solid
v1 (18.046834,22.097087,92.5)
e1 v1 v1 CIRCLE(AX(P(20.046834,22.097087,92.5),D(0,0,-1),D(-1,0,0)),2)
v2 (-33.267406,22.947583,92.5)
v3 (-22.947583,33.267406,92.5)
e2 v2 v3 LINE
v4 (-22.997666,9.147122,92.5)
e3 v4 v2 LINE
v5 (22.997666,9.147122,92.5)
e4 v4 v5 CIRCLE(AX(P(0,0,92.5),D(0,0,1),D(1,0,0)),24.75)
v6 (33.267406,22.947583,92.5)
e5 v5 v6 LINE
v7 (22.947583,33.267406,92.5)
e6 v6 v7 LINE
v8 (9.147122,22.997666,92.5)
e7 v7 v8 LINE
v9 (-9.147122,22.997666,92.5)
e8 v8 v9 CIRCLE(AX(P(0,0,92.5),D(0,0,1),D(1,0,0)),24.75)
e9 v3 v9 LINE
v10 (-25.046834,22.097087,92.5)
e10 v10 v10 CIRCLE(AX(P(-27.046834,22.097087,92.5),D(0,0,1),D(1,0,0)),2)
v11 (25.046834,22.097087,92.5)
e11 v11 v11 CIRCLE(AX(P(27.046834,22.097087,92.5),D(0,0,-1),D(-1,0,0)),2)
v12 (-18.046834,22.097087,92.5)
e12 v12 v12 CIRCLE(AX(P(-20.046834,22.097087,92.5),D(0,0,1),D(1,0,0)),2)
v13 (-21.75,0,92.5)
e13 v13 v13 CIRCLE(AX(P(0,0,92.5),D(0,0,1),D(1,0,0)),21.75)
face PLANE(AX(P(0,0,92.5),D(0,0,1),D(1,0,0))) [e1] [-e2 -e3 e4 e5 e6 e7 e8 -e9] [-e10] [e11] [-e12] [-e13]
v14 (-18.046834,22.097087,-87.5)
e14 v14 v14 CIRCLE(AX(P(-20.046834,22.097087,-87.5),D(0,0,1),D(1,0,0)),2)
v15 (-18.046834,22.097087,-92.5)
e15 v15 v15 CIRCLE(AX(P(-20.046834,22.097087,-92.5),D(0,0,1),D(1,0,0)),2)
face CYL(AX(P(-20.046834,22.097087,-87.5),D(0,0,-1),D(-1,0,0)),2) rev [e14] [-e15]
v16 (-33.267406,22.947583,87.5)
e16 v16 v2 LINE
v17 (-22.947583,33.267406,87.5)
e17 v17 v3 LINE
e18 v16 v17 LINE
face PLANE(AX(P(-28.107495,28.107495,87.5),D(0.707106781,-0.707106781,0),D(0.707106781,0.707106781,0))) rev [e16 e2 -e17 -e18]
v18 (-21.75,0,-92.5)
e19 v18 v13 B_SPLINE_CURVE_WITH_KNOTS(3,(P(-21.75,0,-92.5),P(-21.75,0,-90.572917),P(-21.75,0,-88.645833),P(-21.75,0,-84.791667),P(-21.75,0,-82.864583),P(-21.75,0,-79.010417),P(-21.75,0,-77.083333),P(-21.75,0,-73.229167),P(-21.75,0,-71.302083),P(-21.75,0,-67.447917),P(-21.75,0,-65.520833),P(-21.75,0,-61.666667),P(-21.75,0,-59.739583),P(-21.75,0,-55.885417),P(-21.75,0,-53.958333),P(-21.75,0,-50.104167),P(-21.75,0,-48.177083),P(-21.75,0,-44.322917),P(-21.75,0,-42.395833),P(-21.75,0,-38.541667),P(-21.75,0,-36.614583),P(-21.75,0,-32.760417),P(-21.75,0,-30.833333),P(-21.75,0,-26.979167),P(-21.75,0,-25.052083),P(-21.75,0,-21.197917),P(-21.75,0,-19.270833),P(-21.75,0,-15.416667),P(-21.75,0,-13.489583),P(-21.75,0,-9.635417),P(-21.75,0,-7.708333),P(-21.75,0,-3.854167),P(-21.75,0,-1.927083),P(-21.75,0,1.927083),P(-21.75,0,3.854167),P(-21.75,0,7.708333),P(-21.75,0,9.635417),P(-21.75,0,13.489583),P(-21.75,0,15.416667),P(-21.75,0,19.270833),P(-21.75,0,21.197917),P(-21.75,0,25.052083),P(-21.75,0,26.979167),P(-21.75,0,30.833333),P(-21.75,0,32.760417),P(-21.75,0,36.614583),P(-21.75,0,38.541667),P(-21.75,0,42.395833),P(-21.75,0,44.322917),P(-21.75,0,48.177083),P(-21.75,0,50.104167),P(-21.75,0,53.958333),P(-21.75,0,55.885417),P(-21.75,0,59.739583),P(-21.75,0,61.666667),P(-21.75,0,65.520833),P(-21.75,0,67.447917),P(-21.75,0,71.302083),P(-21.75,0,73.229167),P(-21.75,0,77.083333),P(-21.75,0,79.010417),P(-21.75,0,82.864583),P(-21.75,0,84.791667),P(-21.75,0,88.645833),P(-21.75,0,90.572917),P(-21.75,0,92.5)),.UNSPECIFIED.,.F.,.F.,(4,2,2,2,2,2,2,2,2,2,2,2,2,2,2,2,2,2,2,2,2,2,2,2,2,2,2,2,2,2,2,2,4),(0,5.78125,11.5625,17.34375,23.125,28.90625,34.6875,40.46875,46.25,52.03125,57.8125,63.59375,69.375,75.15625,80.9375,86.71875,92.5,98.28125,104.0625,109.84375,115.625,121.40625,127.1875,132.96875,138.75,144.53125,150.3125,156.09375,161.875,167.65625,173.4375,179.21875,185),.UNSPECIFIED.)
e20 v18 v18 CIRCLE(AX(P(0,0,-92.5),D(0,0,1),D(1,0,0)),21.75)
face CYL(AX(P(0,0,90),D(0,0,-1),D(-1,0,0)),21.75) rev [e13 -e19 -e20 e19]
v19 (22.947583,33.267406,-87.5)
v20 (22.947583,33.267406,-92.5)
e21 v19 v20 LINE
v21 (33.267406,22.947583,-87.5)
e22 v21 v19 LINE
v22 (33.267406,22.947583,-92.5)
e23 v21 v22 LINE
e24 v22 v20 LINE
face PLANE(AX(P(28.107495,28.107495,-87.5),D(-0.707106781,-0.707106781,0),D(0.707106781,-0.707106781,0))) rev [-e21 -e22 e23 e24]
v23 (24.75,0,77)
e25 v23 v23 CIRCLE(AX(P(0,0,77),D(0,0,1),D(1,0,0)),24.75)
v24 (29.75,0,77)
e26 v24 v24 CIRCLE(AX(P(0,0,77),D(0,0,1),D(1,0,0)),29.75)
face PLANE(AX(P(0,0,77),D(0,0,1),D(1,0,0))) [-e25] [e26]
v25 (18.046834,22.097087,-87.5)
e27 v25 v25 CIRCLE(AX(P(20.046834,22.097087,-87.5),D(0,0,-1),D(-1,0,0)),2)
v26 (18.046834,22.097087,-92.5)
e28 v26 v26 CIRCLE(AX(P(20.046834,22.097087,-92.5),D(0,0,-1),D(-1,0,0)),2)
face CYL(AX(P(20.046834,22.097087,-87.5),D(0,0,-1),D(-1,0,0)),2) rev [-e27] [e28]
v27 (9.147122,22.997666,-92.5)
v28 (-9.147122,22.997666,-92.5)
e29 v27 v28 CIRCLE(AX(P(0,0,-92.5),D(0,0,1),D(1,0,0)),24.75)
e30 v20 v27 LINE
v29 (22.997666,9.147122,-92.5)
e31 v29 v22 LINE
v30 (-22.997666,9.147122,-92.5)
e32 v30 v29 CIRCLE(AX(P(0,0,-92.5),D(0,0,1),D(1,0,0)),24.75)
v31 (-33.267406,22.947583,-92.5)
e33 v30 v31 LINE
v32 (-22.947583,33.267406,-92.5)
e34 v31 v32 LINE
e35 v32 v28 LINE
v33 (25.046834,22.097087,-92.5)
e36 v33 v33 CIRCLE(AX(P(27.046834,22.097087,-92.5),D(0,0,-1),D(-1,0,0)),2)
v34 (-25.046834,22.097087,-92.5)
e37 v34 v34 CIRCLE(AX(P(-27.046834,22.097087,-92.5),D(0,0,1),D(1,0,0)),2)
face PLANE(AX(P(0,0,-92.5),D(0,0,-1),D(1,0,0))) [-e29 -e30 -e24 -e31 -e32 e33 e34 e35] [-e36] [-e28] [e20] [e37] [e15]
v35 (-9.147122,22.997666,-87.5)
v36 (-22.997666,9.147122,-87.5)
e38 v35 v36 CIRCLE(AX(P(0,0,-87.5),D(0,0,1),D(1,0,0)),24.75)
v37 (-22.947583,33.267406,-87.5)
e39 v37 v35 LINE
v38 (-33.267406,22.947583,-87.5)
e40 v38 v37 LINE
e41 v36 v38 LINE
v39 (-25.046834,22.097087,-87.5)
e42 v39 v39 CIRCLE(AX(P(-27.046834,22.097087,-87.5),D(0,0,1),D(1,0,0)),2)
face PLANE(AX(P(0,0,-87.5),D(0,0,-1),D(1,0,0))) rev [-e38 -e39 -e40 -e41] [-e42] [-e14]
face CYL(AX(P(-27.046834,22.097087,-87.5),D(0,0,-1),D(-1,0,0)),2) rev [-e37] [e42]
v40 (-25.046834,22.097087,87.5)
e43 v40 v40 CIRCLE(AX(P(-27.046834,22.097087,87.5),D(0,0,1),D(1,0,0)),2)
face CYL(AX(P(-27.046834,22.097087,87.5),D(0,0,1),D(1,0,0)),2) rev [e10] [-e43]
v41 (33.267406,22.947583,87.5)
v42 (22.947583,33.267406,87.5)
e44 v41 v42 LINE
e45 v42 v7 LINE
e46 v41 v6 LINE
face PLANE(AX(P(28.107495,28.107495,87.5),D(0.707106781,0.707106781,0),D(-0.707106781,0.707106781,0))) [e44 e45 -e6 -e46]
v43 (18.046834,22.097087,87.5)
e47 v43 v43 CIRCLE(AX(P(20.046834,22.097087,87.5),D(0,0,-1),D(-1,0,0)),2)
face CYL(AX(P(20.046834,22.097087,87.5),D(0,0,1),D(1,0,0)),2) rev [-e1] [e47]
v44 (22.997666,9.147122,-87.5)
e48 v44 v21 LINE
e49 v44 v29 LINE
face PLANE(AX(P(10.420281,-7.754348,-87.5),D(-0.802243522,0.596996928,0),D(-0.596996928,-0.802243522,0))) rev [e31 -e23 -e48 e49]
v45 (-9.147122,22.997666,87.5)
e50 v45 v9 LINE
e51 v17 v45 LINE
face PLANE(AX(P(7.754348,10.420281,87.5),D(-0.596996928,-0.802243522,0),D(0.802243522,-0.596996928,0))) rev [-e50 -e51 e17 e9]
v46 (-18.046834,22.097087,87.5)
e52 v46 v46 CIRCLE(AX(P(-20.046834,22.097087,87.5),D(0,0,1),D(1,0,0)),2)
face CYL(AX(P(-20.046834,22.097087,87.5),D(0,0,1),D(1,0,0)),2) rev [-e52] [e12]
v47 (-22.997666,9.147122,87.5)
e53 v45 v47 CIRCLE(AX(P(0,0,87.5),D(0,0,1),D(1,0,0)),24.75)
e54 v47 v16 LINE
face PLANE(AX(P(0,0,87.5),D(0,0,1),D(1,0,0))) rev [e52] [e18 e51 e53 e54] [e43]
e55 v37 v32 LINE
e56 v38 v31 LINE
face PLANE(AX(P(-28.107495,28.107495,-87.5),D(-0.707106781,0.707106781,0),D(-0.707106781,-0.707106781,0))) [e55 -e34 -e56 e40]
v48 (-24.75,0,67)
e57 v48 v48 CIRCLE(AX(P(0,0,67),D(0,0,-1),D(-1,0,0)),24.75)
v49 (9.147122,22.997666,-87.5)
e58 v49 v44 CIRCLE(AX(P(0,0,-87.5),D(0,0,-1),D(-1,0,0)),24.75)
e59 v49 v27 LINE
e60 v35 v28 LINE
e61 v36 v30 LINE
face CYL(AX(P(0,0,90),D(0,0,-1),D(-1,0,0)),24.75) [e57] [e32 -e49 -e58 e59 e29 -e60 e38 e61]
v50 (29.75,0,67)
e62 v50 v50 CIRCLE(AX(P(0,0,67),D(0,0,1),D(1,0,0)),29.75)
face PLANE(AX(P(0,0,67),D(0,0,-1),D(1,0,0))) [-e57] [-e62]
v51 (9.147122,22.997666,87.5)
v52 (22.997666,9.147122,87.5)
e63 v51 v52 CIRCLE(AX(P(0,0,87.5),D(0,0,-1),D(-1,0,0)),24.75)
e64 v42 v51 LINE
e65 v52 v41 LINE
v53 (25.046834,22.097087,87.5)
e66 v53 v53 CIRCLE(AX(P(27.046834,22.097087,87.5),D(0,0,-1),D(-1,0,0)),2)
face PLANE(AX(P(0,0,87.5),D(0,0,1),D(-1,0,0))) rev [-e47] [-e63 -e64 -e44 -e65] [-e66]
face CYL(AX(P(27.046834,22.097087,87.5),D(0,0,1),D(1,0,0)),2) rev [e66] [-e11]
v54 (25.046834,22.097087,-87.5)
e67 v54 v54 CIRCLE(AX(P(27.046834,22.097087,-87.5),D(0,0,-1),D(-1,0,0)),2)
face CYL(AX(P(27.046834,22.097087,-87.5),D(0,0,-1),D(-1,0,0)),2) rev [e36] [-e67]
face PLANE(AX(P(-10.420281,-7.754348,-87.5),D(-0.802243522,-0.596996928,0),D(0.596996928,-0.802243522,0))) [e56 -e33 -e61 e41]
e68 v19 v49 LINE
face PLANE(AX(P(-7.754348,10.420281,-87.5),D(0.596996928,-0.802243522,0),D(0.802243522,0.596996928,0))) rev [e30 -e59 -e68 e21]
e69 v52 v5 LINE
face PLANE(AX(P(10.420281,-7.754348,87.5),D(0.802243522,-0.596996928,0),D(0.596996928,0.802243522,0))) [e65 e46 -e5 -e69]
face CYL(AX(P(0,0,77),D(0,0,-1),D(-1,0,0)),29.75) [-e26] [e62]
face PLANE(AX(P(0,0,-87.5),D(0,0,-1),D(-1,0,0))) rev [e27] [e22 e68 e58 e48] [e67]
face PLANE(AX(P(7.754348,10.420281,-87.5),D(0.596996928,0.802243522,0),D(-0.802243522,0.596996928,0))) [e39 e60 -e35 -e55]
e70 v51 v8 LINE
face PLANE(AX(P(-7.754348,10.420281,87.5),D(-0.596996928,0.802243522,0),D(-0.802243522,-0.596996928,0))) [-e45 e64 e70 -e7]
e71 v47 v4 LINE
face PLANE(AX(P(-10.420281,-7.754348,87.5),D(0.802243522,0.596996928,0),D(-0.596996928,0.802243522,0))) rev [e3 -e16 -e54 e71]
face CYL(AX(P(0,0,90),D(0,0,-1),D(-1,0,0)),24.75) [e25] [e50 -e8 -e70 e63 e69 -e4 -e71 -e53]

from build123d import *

# Parameters (mm, degrees)
SKETCH1_R             = 24.75
SKETCH1_R_2           = 21.75
BOSS_EXTRUDE1_DEPTH   = 90
BOSS_EXTRUDE3_START   = 72
SKETCH5_R             = 29.75
SKETCH5_R_2           = 21.75
BOSS_EXTRUDE3_DEPTH   = 5
SKETCH7_R             = 24.75
SKETCH7_R_2           = 21.75
BOSS_EXTRUDE4_DEPTH   = 2.5
BOSS_EXTRUDE5_START   = -5
SKETCH6_R             = 2
BOSS_EXTRUDE5_DEPTH   = 5
MIRROR2_START         = -92.5
MIRROR2_OUTLINE_R     = 24.75
MIRROR2_OUTLINE_R_2   = 21.75
MIRROR2_DEPTH         = 92.5
MIRROR2_START_2       = 67
MIRROR2_2_OUTLINE_R   = 29.75
MIRROR2_2_OUTLINE_R_2 = 24.75
MIRROR2_2_DEPTH       = 5
MIRROR2_3_OUTLINE_R   = 2
MIRROR2_3_DEPTH       = 5


# Read off the part's stored shape, not the designer's step: Mirror2
with BuildPart() as part:
    # Sketch1 → Boss-Extrude1 (new body)
    with BuildSketch(Plane.XY):
        with Locations(Location((0, 0, 0), (0, 0, 180))):
            Circle(SKETCH1_R)
        with Locations(Location((0, 0, 0), (0, 0, 180))):
            Circle(SKETCH1_R_2, mode=Mode.SUBTRACT)
    extrude(amount=BOSS_EXTRUDE1_DEPTH)

    # Sketch5 → Boss-Extrude3 (add)
    with BuildSketch(Plane.XY.offset(BOSS_EXTRUDE3_START)):
        Circle(SKETCH5_R)
        with Locations(Location((0, 0, 0), (0, 0, 180))):
            Circle(SKETCH5_R_2, mode=Mode.SUBTRACT)
    extrude(amount=BOSS_EXTRUDE3_DEPTH)

    # Sketch7 → Boss-Extrude4 (add, symmetric)
    with BuildSketch(Plane.XY.offset(90)):
        with Locations(Location((0, 0, 0), (0, 0, 180))):
            Circle(SKETCH7_R)
        with Locations(Location((0, 0, 0), (0, 0, 180))):
            Circle(SKETCH7_R_2, mode=Mode.SUBTRACT)
    extrude(amount=BOSS_EXTRUDE4_DEPTH, both=True)

    # Sketch6 → Boss-Extrude5 (add)
    with BuildSketch(Plane.XY.offset(92.5).offset(BOSS_EXTRUDE5_START)):
        with BuildLine():
            Line((-22.997666259, 9.147122314), (-33.267406372, 22.947582732))
            Line((-33.267406372, 22.947582732), (-22.947582732, 33.267406372))
            Line((-22.947582732, 33.267406372), (-9.147122314, 22.997666259))
            ThreePointArc((-9.147122314, 22.997666259), (-17.500892834, 17.500892834), (-22.997666259, 9.147122314))
        make_face()
        with Locations((-20.04683438, 22.097086912)):
            Circle(SKETCH6_R, mode=Mode.SUBTRACT)
        with Locations((-27.04683438, 22.097086912)):
            Circle(SKETCH6_R, mode=Mode.SUBTRACT)
    boss_extrude5 = extrude(amount=BOSS_EXTRUDE5_DEPTH)

    # Mirror1: Boss-Extrude5 across plane
    add(boss_extrude5.mirror(Plane(origin=(0, 0, 0), x_dir=(0, 0, 1), z_dir=(1, 0, 0))))

    # Mirror2 outline → Mirror2 (add)
    with BuildSketch(Plane.XY.offset(MIRROR2_START)):
        Circle(MIRROR2_OUTLINE_R)
        Circle(MIRROR2_OUTLINE_R_2, mode=Mode.SUBTRACT)
    extrude(amount=MIRROR2_DEPTH)

    # Mirror2 2 outline → Mirror2 2 (add)
    with BuildSketch(Plane.XY.offset(MIRROR2_START_2)):
        Circle(MIRROR2_2_OUTLINE_R)
        Circle(MIRROR2_2_OUTLINE_R_2, mode=Mode.SUBTRACT)
    extrude(amount=MIRROR2_2_DEPTH)

    # Mirror2 3 outline → Mirror2 3 (add)
    # profile 1 of 2: a face of its own
    with BuildSketch(Plane.XY.offset(MIRROR2_START)):
        with BuildLine():
            ThreePointArc((9.147122314, 22.997666259), (17.500892834, 17.500892834), (22.997666259, 9.147122314))
            Line((22.997666259, 9.147122314), (33.267406372, 22.947582732))
            Line((33.267406372, 22.947582732), (22.947582732, 33.267406372))
            Line((22.947582732, 33.267406372), (9.147122314, 22.997666259))
        make_face()
        with Locations((20.04683438, 22.097086912)):
            Circle(MIRROR2_3_OUTLINE_R, mode=Mode.SUBTRACT)
        with Locations((27.04683438, 22.097086912)):
            Circle(MIRROR2_3_OUTLINE_R, mode=Mode.SUBTRACT)
    # profile 2 of 2: a face of its own
    with BuildSketch(Plane.XY.offset(MIRROR2_START)):
        with BuildLine():
            ThreePointArc((-22.997666259, 9.147122314), (-17.500892834, 17.500892834), (-9.147122314, 22.997666259))
            Line((-9.147122314, 22.997666259), (-22.947582732, 33.267406372))
            Line((-22.947582732, 33.267406372), (-33.267406372, 22.947582732))
            Line((-33.267406372, 22.947582732), (-22.997666259, 9.147122314))
        make_face()
        with Locations((-20.04683438, 22.097086912)):
            Circle(MIRROR2_3_OUTLINE_R, mode=Mode.SUBTRACT)
        with Locations((-27.04683438, 22.097086912)):
            Circle(MIRROR2_3_OUTLINE_R, mode=Mode.SUBTRACT)
    extrude(amount=MIRROR2_3_DEPTH)


solid = part.part
